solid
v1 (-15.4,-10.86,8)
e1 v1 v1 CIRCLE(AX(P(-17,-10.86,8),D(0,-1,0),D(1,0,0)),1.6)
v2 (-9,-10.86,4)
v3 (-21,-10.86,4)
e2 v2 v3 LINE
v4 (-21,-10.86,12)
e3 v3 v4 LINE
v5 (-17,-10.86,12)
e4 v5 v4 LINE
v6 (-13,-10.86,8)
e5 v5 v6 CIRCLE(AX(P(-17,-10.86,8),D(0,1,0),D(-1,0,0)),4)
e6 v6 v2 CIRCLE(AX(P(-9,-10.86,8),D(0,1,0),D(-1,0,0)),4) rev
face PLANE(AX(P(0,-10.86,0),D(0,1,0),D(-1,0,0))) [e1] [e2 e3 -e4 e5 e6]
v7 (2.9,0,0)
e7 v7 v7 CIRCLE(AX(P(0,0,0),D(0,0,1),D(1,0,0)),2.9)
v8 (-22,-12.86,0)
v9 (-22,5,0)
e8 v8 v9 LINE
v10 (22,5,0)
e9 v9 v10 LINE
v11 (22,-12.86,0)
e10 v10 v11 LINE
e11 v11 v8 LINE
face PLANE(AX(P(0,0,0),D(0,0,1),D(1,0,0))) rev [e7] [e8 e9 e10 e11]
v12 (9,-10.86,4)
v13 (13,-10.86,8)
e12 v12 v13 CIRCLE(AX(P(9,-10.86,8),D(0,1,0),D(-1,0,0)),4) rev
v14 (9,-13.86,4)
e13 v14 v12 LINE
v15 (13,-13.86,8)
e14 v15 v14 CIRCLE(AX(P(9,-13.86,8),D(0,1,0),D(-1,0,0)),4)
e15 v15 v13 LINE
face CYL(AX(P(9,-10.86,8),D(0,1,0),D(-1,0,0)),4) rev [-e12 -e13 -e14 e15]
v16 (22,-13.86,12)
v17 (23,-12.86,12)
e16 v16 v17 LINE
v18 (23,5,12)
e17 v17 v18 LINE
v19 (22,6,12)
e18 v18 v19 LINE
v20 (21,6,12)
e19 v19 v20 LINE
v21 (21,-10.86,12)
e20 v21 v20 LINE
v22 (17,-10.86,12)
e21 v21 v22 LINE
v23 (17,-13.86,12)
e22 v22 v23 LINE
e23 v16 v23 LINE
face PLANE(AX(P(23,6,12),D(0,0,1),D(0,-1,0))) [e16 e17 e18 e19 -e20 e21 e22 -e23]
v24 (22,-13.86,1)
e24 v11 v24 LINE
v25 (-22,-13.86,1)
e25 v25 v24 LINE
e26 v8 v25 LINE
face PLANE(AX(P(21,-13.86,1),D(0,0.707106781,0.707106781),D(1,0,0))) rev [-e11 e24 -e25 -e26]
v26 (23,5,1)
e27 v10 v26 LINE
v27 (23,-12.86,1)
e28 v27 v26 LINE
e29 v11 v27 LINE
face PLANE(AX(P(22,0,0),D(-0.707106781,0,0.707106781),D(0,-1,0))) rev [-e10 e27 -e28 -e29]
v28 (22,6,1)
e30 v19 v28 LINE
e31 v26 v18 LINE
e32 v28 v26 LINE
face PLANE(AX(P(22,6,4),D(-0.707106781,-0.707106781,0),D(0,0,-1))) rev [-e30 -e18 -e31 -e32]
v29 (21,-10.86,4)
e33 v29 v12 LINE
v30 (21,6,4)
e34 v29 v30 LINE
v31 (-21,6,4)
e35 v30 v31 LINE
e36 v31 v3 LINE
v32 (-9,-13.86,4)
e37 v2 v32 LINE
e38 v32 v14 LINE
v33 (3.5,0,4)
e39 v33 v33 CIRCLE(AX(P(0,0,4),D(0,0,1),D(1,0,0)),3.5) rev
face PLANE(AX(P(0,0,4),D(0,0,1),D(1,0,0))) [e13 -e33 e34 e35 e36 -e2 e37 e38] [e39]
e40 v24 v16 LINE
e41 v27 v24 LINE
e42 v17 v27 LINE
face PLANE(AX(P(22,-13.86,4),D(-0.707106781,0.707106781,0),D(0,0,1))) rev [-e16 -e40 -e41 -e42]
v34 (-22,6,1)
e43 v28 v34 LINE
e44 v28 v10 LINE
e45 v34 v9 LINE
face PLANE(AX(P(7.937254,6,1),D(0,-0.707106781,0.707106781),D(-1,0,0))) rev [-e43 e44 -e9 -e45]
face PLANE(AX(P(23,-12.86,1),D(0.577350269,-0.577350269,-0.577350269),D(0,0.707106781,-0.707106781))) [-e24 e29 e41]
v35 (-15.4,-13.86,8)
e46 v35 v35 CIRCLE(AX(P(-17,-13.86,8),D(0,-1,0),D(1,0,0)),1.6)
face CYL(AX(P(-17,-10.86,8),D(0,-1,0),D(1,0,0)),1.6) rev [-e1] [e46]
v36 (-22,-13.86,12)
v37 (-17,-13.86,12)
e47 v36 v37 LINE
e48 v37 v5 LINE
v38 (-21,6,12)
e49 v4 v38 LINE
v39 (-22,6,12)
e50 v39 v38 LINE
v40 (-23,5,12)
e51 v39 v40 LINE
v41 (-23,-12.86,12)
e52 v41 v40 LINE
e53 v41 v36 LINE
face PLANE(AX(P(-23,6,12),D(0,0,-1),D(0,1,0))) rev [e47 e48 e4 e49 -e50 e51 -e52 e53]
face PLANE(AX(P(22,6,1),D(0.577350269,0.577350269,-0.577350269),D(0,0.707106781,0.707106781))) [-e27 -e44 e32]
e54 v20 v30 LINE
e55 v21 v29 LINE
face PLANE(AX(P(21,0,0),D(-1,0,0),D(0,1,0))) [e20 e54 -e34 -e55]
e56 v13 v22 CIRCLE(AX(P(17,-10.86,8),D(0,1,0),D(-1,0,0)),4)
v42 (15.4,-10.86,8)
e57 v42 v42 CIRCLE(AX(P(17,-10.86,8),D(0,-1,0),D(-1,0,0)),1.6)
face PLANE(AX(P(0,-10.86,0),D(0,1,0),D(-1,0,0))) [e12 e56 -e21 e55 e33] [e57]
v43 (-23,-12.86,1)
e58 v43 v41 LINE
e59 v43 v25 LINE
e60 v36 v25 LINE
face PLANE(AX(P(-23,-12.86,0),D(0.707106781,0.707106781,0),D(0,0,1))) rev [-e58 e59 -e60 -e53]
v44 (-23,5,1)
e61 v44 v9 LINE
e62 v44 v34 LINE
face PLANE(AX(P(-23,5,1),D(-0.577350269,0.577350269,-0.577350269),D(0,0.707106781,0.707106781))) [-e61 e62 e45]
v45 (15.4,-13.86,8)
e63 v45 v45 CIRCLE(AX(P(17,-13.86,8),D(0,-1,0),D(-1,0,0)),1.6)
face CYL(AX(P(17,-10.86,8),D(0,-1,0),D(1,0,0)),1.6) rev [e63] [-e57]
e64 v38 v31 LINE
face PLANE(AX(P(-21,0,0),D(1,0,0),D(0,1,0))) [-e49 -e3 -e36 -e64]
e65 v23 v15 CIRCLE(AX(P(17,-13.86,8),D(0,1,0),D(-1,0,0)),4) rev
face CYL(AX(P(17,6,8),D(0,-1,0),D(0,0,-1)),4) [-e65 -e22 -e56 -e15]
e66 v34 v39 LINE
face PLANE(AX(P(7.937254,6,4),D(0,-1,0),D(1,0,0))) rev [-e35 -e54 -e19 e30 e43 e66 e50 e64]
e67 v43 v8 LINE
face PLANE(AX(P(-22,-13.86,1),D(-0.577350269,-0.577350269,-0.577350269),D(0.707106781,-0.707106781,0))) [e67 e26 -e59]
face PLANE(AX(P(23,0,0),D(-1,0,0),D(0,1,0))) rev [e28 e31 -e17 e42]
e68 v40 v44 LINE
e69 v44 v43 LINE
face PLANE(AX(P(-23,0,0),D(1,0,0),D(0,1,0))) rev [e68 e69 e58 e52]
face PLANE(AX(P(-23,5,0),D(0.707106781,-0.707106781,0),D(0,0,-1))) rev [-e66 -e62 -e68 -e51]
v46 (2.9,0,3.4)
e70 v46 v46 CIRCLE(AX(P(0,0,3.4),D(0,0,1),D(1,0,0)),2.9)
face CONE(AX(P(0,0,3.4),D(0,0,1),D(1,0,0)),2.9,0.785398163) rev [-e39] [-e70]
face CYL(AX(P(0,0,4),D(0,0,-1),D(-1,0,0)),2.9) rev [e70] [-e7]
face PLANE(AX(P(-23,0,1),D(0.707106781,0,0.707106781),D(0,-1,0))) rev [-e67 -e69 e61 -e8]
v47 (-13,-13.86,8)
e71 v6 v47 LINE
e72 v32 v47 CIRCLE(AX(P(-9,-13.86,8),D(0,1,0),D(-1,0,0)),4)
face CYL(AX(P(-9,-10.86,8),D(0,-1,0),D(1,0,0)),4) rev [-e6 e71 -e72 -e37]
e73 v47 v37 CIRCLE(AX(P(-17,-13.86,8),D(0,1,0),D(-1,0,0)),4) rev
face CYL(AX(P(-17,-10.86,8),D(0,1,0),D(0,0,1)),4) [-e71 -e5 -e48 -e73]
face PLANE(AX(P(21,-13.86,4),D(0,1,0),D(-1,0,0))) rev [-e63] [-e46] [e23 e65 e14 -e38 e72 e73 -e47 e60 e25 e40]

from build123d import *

# Parameters (mm, degrees)
SKETCH_1_R       = 2.9
EXTRUDE_1_DEPTH  = 4
CHAMFER_1_SIZE   = 0.6
SKETCH_3_W       = 12
SKETCH_3_H       = 19.86
EXTRUDE_2_DEPTH  = 2
SKETCH_4_W       = 10
SKETCH_4_H       = 12
SKETCH_4_R       = 1.6
EXTRUDE_3_DEPTH  = 3
FILLET_START     = -15
FILLET_2_DEPTH   = 4.14
FILLET_START_2   = -13.86
FILLET_2_2_DEPTH = 3
CHAMFER_4_SIZE   = 1


with BuildPart() as part:
    # 草图1 → 凸台-拉伸1 (new body)
    with BuildSketch(Plane.XY):
        Polygon((7.937253933, 6), (-21, 6), (-21, -13.86), (7.937253933, -13.86), (21, -13.86), (21, 6), align=None)
        Circle(SKETCH_1_R, mode=Mode.SUBTRACT)
    extrude(amount=EXTRUDE_1_DEPTH)

    # 倒角1
    chamfer_1_edges = [part.edges().sort_by_distance(p)[0] for p in [
        (-2.9, 0, 4),
    ]]
    chamfer(chamfer_1_edges, length=CHAMFER_1_SIZE)

    # 草图3 → 凸台-拉伸2 (add)
    with BuildSketch(Plane.ZY.offset(21)):
        with Locations((6, -3.93)):
            Rectangle(SKETCH_3_W, SKETCH_3_H)
    extrude_2 = extrude(amount=EXTRUDE_2_DEPTH)

    # 镜向1: 凸台-拉伸2 across plane
    add(extrude_2.mirror(Plane(origin=(0, 0, 0), x_dir=(0, 0, 1), z_dir=(1, 0, 0))))

    # 草图4 → 凸台-拉伸3 (add)
    # profile 1 of 2: a face of its own
    with BuildSketch(Plane.XZ.offset(13.86)):
        with Locations((-18, 6)):
            Rectangle(SKETCH_4_W, SKETCH_4_H)
        with Locations((-17, 8)):
            Circle(SKETCH_4_R, mode=Mode.SUBTRACT)
    # profile 2 of 2: a face of its own
    with BuildSketch(Plane.XZ.offset(13.86)):
        with Locations((18, 6)):
            Rectangle(SKETCH_4_W, SKETCH_4_H)
        with Locations(Location((17, 8, 0), (0, 0, 180))):
            Circle(SKETCH_4_R, mode=Mode.SUBTRACT)
    extrude(amount=-EXTRUDE_3_DEPTH)

    # 圆角2: read off the stored shape, not the designer's step
    # 圆角2 outline → 圆角2 (cut)
    with BuildSketch(Plane(origin=(0, 0, 0), x_dir=(1, 0, 0), z_dir=(0, 1, 0)).offset(FILLET_START)):
        with BuildLine():
            Line((13, -12), (17, -12))
            ThreePointArc((17, -12), (14.171572875, -10.828427125), (13, -8))
            Line((13, -8), (13, -12))
        make_face()
        with BuildLine():
            Line((-13, -12), (-13, -8))
            ThreePointArc((-13, -8), (-14.171572875, -10.828427125), (-17, -12))
            Line((-17, -12), (-13, -12))
        make_face()
    extrude(amount=FILLET_2_DEPTH, mode=Mode.SUBTRACT)

    # Fillet 2 2 outline → Fillet 2 2 (add)
    with BuildSketch(Plane(origin=(0, 0, 0), x_dir=(1, 0, 0), z_dir=(0, 1, 0)).offset(FILLET_START_2)):
        with BuildLine():
            ThreePointArc((-13, -8), (-11.828427125, -5.171572875), (-9, -4))
            Line((-9, -4), (-13, -4))
            Line((-13, -4), (-13, -8))
        make_face()
        with BuildLine():
            ThreePointArc((9, -4), (11.828427125, -5.171572875), (13, -8))
            Line((13, -8), (13, -4))
            Line((13, -4), (9, -4))
        make_face()
    extrude(amount=FILLET_2_2_DEPTH)

    # 倒角4
    chamfer_4_edges = [part.edges().sort_by_distance(p)[0] for p in [
        (-23, 6, 6),
        (-23, -3.93, 0),
        (-23, -13.86, 6),
        (23, -13.86, 6),
        (23, -3.93, 0),
        (23, 6, 6),
        (0, 6, 0),
        (0, -13.86, 0),
    ]]
    chamfer(chamfer_4_edges, length=CHAMFER_4_SIZE)


solid = part.part
